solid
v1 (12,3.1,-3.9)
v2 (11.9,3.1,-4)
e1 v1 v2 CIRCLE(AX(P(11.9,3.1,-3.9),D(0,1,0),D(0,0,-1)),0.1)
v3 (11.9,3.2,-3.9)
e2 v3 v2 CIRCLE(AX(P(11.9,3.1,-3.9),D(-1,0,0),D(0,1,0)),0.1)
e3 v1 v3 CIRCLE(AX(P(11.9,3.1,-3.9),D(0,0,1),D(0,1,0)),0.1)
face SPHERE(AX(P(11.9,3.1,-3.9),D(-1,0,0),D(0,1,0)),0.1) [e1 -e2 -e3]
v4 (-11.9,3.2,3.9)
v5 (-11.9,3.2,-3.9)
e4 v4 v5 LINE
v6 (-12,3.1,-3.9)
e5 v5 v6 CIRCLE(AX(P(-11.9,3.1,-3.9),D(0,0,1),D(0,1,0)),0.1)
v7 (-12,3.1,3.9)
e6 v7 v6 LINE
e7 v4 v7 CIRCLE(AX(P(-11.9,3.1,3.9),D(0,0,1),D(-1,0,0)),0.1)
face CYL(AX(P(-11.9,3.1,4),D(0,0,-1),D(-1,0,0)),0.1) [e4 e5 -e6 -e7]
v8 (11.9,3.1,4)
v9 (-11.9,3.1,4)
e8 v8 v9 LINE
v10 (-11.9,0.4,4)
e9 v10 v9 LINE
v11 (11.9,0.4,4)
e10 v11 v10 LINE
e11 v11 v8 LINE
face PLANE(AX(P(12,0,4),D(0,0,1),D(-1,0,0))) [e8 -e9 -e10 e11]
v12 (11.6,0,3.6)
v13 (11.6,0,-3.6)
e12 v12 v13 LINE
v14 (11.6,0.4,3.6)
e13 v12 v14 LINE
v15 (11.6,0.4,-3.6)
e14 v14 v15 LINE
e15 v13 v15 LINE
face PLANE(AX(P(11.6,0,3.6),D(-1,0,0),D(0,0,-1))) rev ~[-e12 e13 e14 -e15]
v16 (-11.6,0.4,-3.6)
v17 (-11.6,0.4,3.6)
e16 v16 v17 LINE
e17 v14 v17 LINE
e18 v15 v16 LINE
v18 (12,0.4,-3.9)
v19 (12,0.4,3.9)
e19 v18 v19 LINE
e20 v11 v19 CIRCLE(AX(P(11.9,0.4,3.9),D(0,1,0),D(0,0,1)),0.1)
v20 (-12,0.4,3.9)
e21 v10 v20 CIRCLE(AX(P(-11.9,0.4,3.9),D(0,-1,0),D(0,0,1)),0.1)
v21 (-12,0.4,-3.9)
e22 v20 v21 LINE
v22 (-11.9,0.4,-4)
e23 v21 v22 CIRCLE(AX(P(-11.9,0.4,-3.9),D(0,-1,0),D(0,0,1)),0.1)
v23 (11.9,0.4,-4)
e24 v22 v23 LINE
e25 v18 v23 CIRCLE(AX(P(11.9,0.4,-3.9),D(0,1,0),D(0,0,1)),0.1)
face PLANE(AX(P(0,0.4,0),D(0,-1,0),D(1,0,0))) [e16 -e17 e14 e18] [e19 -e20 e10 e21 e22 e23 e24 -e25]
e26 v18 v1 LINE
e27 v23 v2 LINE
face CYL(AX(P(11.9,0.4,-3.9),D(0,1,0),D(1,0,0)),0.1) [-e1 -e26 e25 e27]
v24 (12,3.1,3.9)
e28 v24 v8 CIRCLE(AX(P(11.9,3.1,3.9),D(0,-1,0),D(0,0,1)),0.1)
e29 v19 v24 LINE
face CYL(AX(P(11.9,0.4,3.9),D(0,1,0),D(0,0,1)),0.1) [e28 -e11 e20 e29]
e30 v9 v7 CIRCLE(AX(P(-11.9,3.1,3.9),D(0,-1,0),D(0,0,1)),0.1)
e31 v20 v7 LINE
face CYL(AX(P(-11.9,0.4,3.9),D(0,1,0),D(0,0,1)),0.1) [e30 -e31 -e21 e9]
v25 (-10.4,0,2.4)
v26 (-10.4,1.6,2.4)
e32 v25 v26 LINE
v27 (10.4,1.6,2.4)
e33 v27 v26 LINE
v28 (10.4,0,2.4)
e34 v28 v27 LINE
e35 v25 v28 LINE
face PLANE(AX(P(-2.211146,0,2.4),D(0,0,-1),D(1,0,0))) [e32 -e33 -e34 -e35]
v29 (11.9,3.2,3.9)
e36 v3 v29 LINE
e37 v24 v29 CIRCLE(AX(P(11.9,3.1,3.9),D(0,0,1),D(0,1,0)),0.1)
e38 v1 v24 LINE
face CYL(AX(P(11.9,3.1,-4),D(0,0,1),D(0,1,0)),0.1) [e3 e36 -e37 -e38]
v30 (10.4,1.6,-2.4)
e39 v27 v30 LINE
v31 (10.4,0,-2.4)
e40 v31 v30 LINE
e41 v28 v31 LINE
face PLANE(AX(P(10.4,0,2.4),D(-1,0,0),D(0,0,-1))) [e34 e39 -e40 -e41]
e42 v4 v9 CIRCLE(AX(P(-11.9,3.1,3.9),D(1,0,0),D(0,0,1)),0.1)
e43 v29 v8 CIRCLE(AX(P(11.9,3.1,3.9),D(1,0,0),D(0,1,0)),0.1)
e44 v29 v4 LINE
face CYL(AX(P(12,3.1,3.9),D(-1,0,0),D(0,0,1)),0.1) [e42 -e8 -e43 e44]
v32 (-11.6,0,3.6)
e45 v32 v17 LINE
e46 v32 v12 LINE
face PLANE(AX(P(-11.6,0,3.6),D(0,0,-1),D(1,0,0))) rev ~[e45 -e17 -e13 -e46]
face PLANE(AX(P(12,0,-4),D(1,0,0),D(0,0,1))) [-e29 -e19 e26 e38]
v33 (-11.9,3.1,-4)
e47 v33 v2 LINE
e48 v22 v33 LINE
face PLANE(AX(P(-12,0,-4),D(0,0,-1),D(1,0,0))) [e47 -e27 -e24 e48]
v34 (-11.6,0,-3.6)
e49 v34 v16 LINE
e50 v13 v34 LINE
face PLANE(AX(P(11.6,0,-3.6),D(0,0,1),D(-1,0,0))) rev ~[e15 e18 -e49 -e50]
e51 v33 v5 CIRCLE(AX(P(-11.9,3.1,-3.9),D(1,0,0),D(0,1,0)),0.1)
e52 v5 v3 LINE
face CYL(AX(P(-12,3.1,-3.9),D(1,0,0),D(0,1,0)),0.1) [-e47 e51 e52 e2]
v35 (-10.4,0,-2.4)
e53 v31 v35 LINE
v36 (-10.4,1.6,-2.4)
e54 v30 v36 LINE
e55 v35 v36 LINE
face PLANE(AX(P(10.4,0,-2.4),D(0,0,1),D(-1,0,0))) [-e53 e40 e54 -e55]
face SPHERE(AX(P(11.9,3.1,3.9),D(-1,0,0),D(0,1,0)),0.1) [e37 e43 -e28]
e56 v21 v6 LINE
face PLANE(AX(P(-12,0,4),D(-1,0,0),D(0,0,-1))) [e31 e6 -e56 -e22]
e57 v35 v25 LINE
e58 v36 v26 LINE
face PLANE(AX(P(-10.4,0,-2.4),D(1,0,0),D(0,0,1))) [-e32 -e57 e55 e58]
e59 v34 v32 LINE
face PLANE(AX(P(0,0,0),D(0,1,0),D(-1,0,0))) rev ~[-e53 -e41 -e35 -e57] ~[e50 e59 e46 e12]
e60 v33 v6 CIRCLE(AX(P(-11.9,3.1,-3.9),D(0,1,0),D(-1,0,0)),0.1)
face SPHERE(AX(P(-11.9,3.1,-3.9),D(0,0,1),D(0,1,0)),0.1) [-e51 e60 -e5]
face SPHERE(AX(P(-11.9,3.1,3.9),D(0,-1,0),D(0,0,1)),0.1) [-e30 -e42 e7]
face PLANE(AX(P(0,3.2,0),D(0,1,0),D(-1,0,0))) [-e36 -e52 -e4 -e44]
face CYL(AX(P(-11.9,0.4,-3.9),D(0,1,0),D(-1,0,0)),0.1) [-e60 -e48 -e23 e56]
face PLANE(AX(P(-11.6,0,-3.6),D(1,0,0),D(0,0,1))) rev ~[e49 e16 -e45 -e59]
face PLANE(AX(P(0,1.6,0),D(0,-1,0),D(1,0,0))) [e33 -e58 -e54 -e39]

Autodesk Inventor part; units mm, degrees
ref_plane "YZ Plane" through (0, 0, 0) normal (1, 0, 0) x (0, 1, 0)
ref_plane "XZ Plane" through (0, 0, 0) normal (0, 1, 0) x (-1, 0, 0)
ref_plane "XY Plane" through (0, 0, 0) normal (0, 0, 1) x (1, 0, 0)
sketch "Sketch2" plane through (0, 0, 0) normal (0, 1, 0) x (-1, 0, 0)
  line L0 (-12, 4) -> (12, 4)
  line L1 (12, 4) -> (12, -4)
  line L2 (12, -4) -> (-12, -4)
  line L3 (-12, -4) -> (-12, 4)
  point P0 (0, 0)
  point P1 (0, 4)
  point P2 (-12, 0)
  dimension "d0" = 24
  dimension "d1" = 8
extrude "Extrusion1" add sketch "Sketch2" along normal blind 3.2
sketch "Sketch3" plane through (0, 0, 0) normal (0, -1, 0) x (1, 0, 0)
  line L0 (12, 4) -> (-12, 4) projected
  line L1 (-12, 4) -> (-12, -4) projected
  line L2 (-10.4, 2.4) -> (10.4, 2.4)
  line L3 (10.4, 2.4) -> (10.4, -2.4)
  line L4 (10.4, -2.4) -> (-10.4, -2.4)
  line L5 (-10.4, -2.4) -> (-10.4, 2.4)
  circle A0 centre (-4, 4) radius 3.2569
  circle A1 centre (-4, 4) radius 2.4
  line L6 (-12, -4) -> (12, -4) projected
  circle A2 centre (-4, 0) radius 1.6
  line L7 (12, -4) -> (12, 4) projected
  line L8 (-8, 0) -> (0, 0) construction
  line L9 (0, 0) -> (8, 0) construction
  line L10 (-11.6, 3.6) -> (11.6, 3.6)
  line L11 (11.6, 3.6) -> (11.6, -3.6)
  line L12 (11.6, -3.6) -> (-11.6, -3.6)
  line L13 (-11.6, -3.6) -> (-11.6, 3.6)
  point P0 (-10.4, 0)
  point P1 (0, 2.4)
  point P2 (-4, 0)
  point P3 (0, 3.6)
  point P4 (-11.6, 0)
  dimension "d8" = 1.6
  dimension "d60" = 6.5137
  dimension "d61" = 4.8
  dimension "d62" = 1.6
  dimension "d75" = 8
  dimension "d76" = 8
  dimension "d86" = 3.2
  dimension "d89" = 8
  dimension "d95" = 0.4
  dimension "d96" = 0.4
extrude "Extrusion2" cut sketch "Sketch3" against normal blind 1.6 contours A0 A2 A1 L2 | L2 L3 L4 L5 A0 A2 | A1 L2 | L2 A1 A2 A0 | A2 A0 | A0 A2
extrude "Extrusion7" cut sketch "Sketch3" against normal blind 0.4 contours L7 L6 L1 L0 A0 L10 L13 L12 L11 | A0 L10 A1 L0 | A1 L10 L0 | L0 A1 L10 A0
fillet "Fillet1" radius 0.1 8 edges at (-12, 1.8, 4) (0, 3.2, 4) (-12, 3.2, 0) (0, 3.2, -4) (12, 3.2, 0) (12, 1.8, 4) (12, 1.8, -4) (-12, 1.8, -4)
sketch "Skizze10" plane through (0, 3.2, 0) normal (0, 1, 0) x (1, 0, 0)
  line L0 (-11.9, -3.9) -> (-11.9, 3.9) projected
  line L1 (-11.9, -3.9419) -> (-11.9, 3.9419) construction
  line L2 (-11.9, 3.9419) -> (11.9, 3.9419) construction
  line L3 (11.9, 3.9419) -> (11.9, -3.9419) construction
  line L4 (11.9, -3.9419) -> (-11.9, -3.9419) construction
  point P0 (0, 0)
  point P1 (0, 3.9419)
  point P2 (-11.9, 0)
  point P3 (-11.9, 0)
decal "Aufkleber1"
equation "\"d4\" = 0.333333 * lh"
equation "\"d8\" = d62"
equation "\"d60\" = tubeod"
equation "\"d61\" = kd"
equation "\"d62\" = wall"
equation "\"d75\" = lu"
equation "\"d76\" = d75"
equation "\"d86\" = pd"
equation "\"d89\" = lu"
equation "\"d95\" = gw"
equation "\"d96\" = gw"
equation "\"d11\" = 0.333333 * lh - topthk"
equation "\"d97\" = gh"
equation "\"lh\" = 9.6"
equation "\"tubeod\" = 6.513708"
equation "\"kd\" = 4.8"
equation "\"wall\" = 1.6"
equation "\"lu\" = 8"
equation "\"pd\" = 3.2"
equation "\"gw\" = 0.4"
equation "\"topthk\" = 1.6"
equation "\"gh\" = 0.4"
properties part number "42146_63864_1" material "ABS Plastic"
